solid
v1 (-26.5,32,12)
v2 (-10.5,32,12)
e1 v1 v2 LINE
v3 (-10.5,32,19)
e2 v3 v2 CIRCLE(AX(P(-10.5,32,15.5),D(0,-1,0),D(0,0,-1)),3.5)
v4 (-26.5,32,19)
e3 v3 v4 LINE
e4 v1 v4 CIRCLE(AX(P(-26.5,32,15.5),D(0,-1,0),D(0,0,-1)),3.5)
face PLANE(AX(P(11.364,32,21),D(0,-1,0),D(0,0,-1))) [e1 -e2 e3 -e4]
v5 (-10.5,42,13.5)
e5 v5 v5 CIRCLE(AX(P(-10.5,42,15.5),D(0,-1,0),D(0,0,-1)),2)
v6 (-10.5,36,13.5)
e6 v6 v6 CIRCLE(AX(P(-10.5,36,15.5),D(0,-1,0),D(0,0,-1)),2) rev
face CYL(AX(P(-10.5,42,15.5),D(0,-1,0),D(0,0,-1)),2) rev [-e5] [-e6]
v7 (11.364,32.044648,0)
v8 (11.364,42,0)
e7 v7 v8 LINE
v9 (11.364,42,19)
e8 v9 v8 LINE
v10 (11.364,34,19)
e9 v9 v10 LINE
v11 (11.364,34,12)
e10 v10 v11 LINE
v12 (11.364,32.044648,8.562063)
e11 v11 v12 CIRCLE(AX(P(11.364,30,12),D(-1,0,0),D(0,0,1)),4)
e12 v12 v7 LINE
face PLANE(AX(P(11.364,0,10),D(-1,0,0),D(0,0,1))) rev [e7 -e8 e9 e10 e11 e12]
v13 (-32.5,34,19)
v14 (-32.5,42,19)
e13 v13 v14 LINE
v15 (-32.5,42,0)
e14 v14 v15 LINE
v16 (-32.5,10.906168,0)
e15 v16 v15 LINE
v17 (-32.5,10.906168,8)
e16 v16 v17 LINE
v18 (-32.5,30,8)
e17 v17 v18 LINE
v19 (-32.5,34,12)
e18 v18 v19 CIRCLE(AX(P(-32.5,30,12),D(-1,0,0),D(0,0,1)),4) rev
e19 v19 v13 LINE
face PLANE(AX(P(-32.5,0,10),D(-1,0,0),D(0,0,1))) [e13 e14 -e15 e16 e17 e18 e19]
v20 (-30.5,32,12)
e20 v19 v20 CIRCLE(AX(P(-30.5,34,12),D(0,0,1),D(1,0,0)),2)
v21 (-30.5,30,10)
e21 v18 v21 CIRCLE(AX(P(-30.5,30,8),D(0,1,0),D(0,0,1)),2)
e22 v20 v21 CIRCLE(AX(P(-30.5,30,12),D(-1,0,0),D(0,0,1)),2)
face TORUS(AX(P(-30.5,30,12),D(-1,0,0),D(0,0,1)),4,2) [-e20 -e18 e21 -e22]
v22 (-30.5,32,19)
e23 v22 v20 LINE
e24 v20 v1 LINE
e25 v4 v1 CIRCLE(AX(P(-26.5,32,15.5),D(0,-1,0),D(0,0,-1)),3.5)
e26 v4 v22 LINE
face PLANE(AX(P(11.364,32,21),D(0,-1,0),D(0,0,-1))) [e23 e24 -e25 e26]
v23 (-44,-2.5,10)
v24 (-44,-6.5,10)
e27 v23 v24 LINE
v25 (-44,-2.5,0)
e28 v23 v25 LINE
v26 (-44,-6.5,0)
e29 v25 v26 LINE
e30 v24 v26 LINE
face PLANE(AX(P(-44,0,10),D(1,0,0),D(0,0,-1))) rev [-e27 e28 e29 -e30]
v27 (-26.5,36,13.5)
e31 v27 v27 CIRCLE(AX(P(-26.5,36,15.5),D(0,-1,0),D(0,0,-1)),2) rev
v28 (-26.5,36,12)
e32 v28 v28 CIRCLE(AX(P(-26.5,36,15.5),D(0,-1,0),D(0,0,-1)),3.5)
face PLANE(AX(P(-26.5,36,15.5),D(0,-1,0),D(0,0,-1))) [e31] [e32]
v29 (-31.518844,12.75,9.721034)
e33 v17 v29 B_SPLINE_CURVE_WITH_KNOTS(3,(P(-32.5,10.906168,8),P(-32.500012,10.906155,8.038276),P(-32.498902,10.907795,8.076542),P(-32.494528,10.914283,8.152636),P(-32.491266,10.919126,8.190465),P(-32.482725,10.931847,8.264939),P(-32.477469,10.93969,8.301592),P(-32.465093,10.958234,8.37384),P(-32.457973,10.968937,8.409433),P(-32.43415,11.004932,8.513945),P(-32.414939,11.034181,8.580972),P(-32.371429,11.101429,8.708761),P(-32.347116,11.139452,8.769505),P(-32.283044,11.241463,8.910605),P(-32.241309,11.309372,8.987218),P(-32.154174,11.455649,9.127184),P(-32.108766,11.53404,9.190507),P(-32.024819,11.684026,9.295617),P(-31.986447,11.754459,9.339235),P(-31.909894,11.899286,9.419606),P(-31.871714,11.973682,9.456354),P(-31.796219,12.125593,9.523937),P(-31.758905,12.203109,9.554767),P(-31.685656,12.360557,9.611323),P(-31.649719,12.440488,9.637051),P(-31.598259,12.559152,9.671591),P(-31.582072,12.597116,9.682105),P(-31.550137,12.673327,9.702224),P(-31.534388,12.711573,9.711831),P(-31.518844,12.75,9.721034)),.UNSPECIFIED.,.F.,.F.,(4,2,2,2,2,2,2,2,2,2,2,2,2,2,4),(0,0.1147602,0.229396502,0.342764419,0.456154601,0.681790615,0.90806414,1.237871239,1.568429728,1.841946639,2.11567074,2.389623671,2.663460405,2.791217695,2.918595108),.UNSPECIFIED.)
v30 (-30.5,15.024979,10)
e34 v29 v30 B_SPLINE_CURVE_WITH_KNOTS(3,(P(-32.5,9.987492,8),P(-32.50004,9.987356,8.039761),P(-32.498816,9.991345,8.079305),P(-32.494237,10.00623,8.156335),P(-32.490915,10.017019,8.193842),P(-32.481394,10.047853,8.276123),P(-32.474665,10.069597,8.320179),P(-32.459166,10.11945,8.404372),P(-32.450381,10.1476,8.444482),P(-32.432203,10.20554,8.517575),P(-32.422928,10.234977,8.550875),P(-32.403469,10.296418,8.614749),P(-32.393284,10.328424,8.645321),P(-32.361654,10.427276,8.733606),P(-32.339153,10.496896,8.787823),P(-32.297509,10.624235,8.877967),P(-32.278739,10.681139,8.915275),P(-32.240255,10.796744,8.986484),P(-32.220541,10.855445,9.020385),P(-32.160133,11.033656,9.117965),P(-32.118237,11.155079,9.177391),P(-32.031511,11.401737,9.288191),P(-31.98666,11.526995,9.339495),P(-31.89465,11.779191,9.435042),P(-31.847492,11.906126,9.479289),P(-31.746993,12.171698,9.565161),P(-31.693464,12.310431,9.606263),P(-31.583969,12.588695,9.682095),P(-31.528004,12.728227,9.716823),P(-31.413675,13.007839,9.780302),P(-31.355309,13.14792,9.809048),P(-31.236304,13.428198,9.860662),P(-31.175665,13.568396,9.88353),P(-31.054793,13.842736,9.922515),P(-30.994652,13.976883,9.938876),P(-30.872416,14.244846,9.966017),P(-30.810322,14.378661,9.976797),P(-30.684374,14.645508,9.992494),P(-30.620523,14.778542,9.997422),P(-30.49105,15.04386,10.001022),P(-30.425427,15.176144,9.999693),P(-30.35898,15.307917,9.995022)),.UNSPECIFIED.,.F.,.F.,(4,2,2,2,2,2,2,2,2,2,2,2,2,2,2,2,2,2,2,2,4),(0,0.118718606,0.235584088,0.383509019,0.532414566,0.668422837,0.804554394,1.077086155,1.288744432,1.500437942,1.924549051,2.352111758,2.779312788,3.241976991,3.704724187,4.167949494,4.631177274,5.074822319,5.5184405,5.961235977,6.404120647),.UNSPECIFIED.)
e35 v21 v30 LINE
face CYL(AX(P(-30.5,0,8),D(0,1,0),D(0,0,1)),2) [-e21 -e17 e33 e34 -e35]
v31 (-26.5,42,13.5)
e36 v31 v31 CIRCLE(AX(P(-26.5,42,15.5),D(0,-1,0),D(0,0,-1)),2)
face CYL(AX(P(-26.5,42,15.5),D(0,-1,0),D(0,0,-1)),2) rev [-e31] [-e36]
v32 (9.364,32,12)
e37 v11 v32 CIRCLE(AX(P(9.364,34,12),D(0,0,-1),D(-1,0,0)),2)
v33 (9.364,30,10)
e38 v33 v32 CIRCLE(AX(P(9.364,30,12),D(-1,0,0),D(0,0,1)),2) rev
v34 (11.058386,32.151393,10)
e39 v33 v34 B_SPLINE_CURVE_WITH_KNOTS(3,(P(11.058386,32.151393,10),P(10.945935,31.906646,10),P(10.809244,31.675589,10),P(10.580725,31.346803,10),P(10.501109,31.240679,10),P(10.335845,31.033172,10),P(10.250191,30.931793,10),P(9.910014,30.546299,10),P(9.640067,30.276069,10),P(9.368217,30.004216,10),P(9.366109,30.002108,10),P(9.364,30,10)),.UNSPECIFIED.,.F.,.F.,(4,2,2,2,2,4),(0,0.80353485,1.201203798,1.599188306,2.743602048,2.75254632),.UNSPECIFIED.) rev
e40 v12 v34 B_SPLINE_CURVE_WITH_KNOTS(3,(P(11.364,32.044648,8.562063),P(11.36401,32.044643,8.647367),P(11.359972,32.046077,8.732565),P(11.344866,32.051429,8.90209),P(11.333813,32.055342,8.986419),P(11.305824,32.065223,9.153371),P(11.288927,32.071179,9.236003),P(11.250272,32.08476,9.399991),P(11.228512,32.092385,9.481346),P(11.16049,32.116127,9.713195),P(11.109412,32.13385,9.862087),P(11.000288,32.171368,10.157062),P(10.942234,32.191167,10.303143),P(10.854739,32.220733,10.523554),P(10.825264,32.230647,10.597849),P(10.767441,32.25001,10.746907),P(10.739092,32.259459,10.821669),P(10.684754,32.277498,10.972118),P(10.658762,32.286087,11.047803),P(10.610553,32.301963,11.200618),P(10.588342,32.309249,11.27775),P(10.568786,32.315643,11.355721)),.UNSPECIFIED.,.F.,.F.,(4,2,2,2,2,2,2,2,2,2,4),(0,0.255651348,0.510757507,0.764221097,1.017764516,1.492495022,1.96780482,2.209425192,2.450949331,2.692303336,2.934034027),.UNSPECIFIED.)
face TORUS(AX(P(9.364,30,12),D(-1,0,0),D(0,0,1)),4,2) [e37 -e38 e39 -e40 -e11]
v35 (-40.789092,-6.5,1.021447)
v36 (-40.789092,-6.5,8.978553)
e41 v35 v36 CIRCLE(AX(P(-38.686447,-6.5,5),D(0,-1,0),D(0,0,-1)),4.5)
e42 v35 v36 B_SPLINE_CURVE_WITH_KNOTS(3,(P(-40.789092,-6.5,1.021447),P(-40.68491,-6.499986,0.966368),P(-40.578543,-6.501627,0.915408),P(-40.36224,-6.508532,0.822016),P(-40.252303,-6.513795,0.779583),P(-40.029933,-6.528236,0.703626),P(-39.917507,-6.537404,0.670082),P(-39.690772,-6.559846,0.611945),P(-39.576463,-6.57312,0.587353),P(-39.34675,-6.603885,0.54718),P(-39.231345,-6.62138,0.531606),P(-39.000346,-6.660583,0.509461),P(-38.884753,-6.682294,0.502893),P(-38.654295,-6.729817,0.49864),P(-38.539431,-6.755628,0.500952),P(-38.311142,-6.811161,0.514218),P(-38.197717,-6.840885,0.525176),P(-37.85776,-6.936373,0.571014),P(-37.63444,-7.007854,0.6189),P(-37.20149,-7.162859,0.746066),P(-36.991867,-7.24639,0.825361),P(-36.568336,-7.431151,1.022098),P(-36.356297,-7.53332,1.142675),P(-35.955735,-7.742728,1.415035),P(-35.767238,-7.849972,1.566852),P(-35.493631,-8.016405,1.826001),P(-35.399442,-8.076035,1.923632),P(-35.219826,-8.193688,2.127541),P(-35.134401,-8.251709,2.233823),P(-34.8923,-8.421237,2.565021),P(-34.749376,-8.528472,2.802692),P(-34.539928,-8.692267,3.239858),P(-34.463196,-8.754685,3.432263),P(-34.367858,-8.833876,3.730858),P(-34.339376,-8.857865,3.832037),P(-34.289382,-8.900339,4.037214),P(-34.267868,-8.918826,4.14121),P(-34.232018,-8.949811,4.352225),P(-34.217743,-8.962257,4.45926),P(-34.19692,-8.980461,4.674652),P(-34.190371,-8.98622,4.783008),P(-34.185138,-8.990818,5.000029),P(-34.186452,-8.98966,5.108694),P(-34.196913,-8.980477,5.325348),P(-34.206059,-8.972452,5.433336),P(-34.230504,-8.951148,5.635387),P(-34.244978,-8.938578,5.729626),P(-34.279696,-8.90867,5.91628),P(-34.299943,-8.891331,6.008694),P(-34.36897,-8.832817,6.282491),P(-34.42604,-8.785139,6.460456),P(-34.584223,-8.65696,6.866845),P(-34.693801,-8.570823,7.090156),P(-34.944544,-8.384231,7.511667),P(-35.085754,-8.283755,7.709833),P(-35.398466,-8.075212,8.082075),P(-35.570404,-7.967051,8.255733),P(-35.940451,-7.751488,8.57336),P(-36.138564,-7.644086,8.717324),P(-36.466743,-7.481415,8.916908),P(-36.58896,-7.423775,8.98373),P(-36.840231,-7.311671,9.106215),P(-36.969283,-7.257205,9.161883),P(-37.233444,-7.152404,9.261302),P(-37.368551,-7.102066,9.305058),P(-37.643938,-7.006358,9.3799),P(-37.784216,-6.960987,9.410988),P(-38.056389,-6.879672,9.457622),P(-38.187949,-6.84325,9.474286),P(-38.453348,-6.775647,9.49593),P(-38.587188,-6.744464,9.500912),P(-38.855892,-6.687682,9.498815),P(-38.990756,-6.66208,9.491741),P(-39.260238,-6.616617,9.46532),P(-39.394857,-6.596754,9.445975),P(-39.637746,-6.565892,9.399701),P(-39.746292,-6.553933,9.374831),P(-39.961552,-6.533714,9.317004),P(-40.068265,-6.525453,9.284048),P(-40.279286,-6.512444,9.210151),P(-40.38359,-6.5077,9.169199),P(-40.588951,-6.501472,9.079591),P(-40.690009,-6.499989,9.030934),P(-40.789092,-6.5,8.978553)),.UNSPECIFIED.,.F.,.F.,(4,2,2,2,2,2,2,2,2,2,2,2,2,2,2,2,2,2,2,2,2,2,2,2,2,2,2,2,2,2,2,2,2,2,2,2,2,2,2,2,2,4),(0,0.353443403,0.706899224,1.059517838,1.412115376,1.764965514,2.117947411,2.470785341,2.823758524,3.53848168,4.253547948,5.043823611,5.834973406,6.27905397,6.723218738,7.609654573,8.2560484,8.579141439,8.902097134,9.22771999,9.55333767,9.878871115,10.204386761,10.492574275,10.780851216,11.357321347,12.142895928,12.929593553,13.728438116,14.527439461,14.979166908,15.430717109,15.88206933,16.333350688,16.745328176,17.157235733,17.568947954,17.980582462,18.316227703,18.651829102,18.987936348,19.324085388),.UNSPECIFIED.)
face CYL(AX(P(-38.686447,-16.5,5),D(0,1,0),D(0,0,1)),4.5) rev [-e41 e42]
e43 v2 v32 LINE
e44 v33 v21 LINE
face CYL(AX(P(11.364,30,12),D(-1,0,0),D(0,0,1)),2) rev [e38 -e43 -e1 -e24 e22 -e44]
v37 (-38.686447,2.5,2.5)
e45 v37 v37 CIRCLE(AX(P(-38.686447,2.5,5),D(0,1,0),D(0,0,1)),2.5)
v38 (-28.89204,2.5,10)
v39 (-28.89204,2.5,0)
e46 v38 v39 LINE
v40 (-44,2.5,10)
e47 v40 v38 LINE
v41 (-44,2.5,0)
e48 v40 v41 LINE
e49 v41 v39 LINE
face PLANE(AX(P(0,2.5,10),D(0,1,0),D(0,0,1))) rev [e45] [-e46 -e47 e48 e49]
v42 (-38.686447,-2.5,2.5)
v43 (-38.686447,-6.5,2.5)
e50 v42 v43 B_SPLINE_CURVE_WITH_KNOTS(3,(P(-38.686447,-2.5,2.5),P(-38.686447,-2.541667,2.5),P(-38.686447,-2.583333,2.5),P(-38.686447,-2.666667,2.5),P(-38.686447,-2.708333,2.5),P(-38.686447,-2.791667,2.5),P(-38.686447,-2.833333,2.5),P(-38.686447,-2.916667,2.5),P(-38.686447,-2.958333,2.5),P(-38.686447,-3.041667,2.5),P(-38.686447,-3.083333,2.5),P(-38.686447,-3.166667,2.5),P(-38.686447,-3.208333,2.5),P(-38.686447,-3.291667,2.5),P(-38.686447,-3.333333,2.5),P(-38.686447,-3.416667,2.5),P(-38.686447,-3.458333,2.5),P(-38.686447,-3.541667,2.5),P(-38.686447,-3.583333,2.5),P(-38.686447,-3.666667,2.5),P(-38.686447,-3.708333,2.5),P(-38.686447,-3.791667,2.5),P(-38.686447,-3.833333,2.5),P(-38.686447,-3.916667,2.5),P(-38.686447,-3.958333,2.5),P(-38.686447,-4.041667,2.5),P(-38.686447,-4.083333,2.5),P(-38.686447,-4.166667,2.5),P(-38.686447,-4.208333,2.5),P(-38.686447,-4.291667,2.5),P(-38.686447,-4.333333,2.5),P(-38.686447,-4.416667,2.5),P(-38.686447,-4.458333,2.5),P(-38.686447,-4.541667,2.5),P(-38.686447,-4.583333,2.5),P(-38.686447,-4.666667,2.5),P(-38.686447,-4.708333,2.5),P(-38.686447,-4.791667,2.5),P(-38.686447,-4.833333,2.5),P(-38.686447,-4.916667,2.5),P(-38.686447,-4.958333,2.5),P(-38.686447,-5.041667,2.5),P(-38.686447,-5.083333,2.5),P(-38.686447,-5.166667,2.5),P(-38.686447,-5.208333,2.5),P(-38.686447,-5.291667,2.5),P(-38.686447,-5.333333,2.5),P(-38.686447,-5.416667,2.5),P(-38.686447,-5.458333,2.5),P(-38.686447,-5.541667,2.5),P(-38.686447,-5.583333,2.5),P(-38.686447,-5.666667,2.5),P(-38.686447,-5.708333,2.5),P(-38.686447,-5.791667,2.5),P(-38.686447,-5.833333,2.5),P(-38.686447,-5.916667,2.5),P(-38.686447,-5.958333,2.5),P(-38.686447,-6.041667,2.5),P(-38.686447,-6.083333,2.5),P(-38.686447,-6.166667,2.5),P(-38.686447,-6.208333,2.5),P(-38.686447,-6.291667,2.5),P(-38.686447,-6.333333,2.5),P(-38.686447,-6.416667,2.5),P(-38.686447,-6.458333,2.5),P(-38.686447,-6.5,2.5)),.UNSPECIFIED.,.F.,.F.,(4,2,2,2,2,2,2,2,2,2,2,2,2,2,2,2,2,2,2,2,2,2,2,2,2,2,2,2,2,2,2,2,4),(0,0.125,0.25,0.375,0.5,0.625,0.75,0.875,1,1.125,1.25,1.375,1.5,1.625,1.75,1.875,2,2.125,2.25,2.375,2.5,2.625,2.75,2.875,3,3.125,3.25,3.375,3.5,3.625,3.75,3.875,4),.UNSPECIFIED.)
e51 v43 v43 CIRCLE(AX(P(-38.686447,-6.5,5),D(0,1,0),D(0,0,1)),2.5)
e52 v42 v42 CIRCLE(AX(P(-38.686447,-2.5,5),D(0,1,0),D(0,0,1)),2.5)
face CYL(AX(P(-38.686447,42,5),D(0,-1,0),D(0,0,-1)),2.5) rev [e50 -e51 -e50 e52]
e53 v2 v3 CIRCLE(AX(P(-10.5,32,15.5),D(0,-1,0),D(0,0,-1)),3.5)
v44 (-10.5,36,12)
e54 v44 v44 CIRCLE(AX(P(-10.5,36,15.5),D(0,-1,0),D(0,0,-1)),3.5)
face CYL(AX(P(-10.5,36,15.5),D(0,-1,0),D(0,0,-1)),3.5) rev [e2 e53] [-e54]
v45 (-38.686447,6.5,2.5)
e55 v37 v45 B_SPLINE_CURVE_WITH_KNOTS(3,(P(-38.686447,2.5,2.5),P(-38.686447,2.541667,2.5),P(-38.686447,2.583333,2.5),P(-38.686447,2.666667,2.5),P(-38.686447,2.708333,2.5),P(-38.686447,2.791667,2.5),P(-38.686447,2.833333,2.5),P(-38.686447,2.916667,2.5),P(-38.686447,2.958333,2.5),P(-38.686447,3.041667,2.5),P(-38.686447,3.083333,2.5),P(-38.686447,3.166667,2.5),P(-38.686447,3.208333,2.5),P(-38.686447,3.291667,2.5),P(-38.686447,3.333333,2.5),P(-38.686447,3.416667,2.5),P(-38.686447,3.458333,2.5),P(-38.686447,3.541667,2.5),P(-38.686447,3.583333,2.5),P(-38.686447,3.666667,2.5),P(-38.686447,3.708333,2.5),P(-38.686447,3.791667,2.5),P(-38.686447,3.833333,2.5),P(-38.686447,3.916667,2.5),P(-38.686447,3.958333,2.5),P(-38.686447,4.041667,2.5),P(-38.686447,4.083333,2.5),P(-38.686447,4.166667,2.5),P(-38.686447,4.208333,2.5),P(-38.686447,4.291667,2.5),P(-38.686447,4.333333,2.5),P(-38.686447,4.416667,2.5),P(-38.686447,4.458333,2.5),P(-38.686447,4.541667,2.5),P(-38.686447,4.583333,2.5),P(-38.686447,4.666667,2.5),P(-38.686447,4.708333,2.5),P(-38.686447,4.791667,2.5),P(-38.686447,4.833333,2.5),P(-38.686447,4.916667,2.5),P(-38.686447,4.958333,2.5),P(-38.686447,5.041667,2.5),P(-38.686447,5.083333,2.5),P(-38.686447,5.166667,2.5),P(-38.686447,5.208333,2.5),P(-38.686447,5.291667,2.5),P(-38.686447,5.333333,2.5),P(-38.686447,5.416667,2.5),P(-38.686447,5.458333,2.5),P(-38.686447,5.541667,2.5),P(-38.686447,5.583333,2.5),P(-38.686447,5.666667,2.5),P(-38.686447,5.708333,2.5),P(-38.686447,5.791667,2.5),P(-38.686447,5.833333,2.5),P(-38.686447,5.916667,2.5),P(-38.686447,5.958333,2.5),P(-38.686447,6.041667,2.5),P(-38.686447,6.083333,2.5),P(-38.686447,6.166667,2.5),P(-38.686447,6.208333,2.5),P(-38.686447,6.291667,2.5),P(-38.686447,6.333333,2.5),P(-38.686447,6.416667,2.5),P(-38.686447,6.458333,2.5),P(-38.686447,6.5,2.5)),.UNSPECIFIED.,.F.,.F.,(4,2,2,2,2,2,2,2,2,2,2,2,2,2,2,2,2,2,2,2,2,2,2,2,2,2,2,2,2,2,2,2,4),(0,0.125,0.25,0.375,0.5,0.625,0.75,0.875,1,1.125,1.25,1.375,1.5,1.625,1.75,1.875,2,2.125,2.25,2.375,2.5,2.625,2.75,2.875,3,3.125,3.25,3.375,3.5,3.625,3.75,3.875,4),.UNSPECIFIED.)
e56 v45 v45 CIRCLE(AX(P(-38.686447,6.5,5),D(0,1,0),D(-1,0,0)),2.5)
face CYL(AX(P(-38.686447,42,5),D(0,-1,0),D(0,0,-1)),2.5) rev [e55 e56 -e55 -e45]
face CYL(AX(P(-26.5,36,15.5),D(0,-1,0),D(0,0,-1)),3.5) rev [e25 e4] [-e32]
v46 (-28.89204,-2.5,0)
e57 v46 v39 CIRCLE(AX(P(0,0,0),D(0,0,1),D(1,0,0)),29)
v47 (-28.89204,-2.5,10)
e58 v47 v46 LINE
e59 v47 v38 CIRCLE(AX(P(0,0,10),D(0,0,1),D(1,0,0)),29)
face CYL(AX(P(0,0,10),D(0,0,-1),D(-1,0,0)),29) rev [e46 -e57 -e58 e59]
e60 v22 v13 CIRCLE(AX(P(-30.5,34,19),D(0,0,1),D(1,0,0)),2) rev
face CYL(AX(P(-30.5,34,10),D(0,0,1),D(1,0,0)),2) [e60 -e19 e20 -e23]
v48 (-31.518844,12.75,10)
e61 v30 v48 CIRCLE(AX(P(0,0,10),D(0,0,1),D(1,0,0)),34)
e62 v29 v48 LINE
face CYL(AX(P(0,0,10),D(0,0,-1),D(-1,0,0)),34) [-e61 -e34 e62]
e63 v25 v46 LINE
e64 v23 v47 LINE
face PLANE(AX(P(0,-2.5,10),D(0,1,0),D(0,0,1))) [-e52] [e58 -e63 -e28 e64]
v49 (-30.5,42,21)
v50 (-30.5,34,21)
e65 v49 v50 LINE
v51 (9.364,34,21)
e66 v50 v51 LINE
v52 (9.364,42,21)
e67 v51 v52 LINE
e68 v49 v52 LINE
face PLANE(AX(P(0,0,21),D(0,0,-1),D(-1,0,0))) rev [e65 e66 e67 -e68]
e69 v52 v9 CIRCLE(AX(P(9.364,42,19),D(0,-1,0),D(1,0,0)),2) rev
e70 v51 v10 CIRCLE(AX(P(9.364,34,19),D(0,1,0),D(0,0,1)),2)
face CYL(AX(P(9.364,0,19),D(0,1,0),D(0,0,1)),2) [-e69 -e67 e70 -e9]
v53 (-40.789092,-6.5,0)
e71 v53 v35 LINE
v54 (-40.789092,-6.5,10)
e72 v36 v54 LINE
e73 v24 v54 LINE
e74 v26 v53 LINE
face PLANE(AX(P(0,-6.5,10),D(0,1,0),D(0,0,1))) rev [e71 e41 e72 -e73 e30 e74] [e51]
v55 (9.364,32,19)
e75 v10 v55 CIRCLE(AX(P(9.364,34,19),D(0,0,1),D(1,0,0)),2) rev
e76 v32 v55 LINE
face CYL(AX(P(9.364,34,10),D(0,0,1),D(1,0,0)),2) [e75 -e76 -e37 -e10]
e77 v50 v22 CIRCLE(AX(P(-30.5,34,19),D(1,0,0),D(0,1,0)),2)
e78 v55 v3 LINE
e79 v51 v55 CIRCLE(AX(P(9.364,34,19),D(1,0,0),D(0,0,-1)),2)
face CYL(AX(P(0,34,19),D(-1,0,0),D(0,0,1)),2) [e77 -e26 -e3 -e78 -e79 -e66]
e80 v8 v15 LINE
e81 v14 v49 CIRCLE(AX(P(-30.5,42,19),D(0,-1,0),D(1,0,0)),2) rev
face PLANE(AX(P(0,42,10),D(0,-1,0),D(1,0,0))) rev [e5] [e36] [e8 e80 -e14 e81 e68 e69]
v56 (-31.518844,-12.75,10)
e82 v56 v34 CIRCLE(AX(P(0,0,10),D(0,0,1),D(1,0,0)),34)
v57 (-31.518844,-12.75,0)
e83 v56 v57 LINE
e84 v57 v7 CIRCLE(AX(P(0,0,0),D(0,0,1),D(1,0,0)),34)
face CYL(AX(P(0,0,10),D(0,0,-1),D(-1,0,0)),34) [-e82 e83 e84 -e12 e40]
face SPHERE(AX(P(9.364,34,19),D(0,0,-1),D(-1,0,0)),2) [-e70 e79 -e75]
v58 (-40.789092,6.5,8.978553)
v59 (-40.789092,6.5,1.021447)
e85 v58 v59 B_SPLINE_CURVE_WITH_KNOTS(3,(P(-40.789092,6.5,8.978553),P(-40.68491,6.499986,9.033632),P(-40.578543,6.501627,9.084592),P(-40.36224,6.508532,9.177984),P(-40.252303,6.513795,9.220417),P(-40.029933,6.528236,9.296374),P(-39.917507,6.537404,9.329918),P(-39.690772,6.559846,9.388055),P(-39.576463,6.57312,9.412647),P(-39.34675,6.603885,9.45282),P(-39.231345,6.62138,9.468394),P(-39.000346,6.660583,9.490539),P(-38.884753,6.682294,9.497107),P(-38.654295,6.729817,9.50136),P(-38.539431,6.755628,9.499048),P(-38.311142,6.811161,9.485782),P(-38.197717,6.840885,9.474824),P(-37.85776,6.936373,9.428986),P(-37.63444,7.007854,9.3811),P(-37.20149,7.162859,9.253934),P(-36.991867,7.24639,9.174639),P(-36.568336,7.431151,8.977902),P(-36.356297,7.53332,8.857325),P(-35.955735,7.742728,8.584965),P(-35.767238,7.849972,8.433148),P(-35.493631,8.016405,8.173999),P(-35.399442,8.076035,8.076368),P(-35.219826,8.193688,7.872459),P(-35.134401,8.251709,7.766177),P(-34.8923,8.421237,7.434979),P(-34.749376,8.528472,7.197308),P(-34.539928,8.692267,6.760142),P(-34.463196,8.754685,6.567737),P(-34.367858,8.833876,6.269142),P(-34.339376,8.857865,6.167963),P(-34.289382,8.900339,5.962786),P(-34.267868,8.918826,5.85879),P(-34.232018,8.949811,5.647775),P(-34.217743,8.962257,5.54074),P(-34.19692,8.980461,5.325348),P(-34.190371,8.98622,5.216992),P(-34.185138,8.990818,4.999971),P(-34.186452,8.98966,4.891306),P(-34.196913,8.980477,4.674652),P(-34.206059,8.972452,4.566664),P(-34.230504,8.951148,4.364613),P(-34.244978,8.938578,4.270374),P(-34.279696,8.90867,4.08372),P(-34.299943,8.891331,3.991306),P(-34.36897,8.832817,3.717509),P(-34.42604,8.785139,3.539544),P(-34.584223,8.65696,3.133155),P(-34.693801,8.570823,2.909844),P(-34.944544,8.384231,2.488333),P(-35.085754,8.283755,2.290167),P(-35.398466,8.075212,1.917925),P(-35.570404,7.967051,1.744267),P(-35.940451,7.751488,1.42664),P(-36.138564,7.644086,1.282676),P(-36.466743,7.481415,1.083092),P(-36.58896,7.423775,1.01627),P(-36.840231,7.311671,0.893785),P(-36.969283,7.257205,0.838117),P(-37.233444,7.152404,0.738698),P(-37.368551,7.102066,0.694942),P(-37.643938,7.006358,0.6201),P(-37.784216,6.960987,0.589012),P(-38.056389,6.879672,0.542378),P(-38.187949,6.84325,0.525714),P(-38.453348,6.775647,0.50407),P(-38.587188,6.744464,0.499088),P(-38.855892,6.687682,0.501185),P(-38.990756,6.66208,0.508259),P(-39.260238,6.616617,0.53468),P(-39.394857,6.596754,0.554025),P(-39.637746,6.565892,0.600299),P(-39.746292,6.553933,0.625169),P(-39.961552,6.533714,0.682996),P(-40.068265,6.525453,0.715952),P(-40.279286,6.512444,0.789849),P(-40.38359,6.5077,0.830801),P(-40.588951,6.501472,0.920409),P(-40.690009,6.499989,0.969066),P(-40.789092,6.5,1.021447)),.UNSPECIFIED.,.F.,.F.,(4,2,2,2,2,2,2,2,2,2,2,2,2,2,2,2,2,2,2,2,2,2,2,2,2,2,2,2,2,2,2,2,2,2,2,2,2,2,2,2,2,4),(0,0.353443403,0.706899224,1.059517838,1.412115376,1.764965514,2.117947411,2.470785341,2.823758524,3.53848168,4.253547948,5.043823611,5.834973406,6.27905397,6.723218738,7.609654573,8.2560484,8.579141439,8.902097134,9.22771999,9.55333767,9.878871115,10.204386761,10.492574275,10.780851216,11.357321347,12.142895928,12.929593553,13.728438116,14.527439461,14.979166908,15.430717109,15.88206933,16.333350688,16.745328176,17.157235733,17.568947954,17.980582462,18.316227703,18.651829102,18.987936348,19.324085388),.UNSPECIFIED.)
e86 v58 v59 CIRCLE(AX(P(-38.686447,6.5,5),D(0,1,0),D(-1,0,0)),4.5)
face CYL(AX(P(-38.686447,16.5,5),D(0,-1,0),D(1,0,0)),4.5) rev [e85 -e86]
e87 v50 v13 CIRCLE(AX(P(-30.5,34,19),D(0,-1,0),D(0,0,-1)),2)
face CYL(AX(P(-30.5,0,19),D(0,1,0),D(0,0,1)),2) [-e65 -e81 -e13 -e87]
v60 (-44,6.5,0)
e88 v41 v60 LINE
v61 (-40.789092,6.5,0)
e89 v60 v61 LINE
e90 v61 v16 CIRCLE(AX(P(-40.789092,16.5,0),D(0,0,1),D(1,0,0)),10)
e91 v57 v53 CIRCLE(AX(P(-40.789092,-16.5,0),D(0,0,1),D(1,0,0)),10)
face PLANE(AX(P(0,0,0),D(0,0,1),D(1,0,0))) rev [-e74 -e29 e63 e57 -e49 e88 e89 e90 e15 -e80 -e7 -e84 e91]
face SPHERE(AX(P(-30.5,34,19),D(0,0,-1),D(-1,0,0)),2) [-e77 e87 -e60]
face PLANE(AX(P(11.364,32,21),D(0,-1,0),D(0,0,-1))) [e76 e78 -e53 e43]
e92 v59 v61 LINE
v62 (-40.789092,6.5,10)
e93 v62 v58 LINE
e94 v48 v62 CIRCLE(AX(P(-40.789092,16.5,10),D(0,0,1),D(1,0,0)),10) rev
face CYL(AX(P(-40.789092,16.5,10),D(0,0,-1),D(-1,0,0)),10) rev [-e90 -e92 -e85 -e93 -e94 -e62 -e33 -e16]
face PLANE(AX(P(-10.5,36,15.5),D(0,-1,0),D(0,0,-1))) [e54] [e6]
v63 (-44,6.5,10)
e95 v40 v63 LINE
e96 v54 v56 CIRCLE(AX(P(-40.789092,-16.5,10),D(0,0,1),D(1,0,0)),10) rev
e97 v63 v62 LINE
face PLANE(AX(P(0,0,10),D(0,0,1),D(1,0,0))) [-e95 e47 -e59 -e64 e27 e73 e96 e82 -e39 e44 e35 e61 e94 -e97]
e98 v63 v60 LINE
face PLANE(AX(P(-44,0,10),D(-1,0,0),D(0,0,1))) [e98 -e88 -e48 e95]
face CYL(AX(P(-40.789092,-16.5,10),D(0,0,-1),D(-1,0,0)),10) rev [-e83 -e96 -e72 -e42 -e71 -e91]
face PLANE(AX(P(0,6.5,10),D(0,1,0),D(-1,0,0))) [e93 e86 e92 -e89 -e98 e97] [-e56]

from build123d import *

# Parameters (mm, degrees)
BOSS_EXTRUDE3_DEPTH     = 10
SKETCH3_W               = 43.8640004
SKETCH3_H               = 10
BOSS_EXTRUDE4_DEPTH     = 21
SKETCH4_R               = 2
CUT_EXTRUDE1_DEPTH      = 83.054859698
SKETCH5_R               = 3.5
CUT_EXTRUDE2_DEPTH      = 4
FILLET1_R               = 2
FILLET2_R               = 2
FILLET3_R               = 2
FILLET4_R               = 2
CUT_EXTRUDE3_DEPTH      = 69.769542741
CUT_EXTRUDE3_DEPTH_BACK = 69.769542741
SKETCH6_R               = 2.5
FILLET5_R               = 10
FILLET6_R               = 10
SKETCH7_R               = 4.5
CUT_EXTRUDE4_DEPTH      = 10
CUT_EXTRUDE5_START      = 10
SKETCH8_R               = 4.5
CUT_EXTRUDE5_DEPTH      = 10


# Some blends are built 0.0001 mm under size
with BuildPart() as part:
    # Sketch2 → Boss-Extrude3 (new body)
    with BuildSketch(Plane.XY):
        with BuildLine():
            Line((-44, -2.5), (-44, -6.5))
            Line((-44, -6.5), (-33.372893192, -6.5))
            ThreePointArc((-33.372893192, -6.5), (22.19279887, -25.758099276), (11.3640004, 32.04464846))
            Line((11.3640004, 32.04464846), (11.3640004, 42))
            Line((11.3640004, 42), (-32.5, 42))
            Line((-32.5, 42), (-32.5, 9.987492178))
            ThreePointArc((-32.5, 9.987492178), (-32.982573653, 8.255291346), (-33.372893192, 6.5))
            Line((-33.372893192, 6.5), (-44, 6.5))
            Line((-44, 6.5), (-44, 2.5))
            Line((-44, 2.5), (-28.892040426, 2.5))
            ThreePointArc((-28.892040426, 2.5), (29, 0), (-28.892040426, -2.5))
            Line((-28.892040426, -2.5), (-44, -2.5))
        make_face()
    extrude(amount=BOSS_EXTRUDE3_DEPTH)

    # Sketch3 → Boss-Extrude4 (add)
    with BuildSketch(Plane(origin=(0, 0, 0), x_dir=(-1, 0, 0), z_dir=(0, 0, -1))):
        with Locations((10.5679998, 37)):
            Rectangle(SKETCH3_W, SKETCH3_H)
    extrude(amount=-BOSS_EXTRUDE4_DEPTH)

    # Sketch4 → Cut-Extrude1 (cut, through all)
    with BuildSketch(Plane.XZ.offset(-32)):
        with Locations(Location((-26.5, 15.5, 0), (0, 0, 270))):
            Circle(SKETCH4_R)
        with Locations(Location((-10.5, 15.5, 0), (0, 0, 270))):
            Circle(SKETCH4_R)
    extrude(amount=-CUT_EXTRUDE1_DEPTH, mode=Mode.SUBTRACT)

    # Sketch5 → Cut-Extrude2 (cut)
    with BuildSketch(Plane.XZ.offset(-32)):
        with Locations(Location((-26.5, 15.5, 0), (0, 0, 270))):
            Circle(SKETCH5_R)
        with Locations(Location((-10.5, 15.5, 0), (0, 0, 270))):
            Circle(SKETCH5_R)
    extrude(amount=-CUT_EXTRUDE2_DEPTH, mode=Mode.SUBTRACT)

    # Fillet1
    fillet1_edges = [part.edges().sort_by_distance(p)[0] for p in [
        (-10.5679998, 32, 10),
    ]]
    fillet(fillet1_edges, radius=FILLET1_R - 0.0001)  # a hair under: the kernel refuses the full size

    # Fillet2
    # the kernel refuses this fillet: 2 mm, written as the material it takes off along each edge
    with BuildSketch(Plane(origin=(11.3640004, 30.0001, 11.9999), x_dir=(0, -0.597567009658115, 0.8018189751859569), z_dir=(0, 0.8018189751859569, 0.597567009658115))) as fillet2_piece_1_section:
        with BuildLine():
            CenterArc((1.9999 + FILLET2_R, -FILLET2_R), FILLET2_R, 90, 90)
            Line((1.9999 + FILLET2_R, 0), (1.9999, 0))
            Line((1.9999, 0), (1.9999, -FILLET2_R))
        make_face()
    fillet2_piece_1 = revolve(axis=Axis((11.3640004, 30.0001, 11.9999), (1, 0, 0)), revolution_arc=233.304154445, mode=Mode.PRIVATE)
    fillet2_piece_1 = split(fillet2_piece_1, bisect_by=Plane(origin=(10.740737353, 31.499904871, 10), z_dir=(0, 0, 1)), keep=Keep.TOP, mode=Mode.PRIVATE)
    add(fillet2_piece_1, mode=Mode.SUBTRACT)
    with BuildSketch(Plane(origin=(11.3640004, 30.0001, 11.9999), x_dir=(0, -0.597567009658115, 0.8018189751859569), z_dir=(0, 0.8018189751859569, 0.597567009658115))) as fillet2_piece_2_section:
        with BuildLine():
            CenterArc((1.9999 + FILLET2_R, -FILLET2_R), FILLET2_R, 90, 90)
            Line((1.9999 + FILLET2_R, 0), (1.9999, 0))
            Line((1.9999, 0), (1.9999, -FILLET2_R))
        make_face()
    fillet2_piece_2 = revolve(axis=Axis((11.3640004, 30.0001, 11.9999), (1, 0, 0)), revolution_arc=233.304154445, mode=Mode.PRIVATE)
    fillet2_piece_2 = fillet2_piece_2 - Plane(origin=(0, 0, 9.683888081), x_dir=(-0.9815556821156025, -0.19117647058823523, 0), z_dir=(0, 0, -1)) * Cylinder(34, 16, mode=Mode.PRIVATE)
    add(fillet2_piece_2, mode=Mode.SUBTRACT)
    with BuildSketch(Plane(origin=(11.3640004, 32, 11.9999), x_dir=(-1, 0, 0), z_dir=(0, 0, 1))) as fillet2_piece_3:
        with BuildLine():
            CenterArc((FILLET2_R, -FILLET2_R), FILLET2_R, 90, 90)
            Line((0, -FILLET2_R), (0, 0))
            Line((0, 0), (FILLET2_R, 0))
        make_face()
    extrude(amount=14.0001, mode=Mode.SUBTRACT)

    # Fillet3
    fillet3_edges = [part.edges().sort_by_distance(p)[0] for p in [
        (-32.5, 31.414242852, 10.585757148),
        (-32.5, 19.993796089, 10),
        (-32.5, 32, 16.49995),
    ]]
    fillet(fillet3_edges, radius=FILLET3_R)

    # Fillet4
    fillet4_edges = [part.edges().sort_by_distance(p)[0] for p in [
        (-10.5679998, 32, 21),
        (10.778213962, 32.585786438, 21),
        (-32.5, 38, 21),
        (-31.914213562, 32.585786438, 21),
        (11.3640004, 38, 21),
    ]]
    fillet(fillet4_edges, radius=FILLET4_R - 0.0001)  # a hair under: the kernel refuses the full size

    # Sketch6 → Cut-Extrude3 (cut, two sides: drawn at the far end of the back side and taken through both)
    with BuildSketch(Plane.XZ.offset(6.5).offset(-CUT_EXTRUDE3_DEPTH_BACK)):
        with Locations(Location((-38.686446596, 5, 0), (0, 0, 270))):
            Circle(SKETCH6_R)
    extrude(amount=CUT_EXTRUDE3_DEPTH + CUT_EXTRUDE3_DEPTH_BACK, mode=Mode.SUBTRACT)

    # Fillet5
    # the kernel refuses this fillet: 10 mm, written as the material it adds along each edge
    with BuildSketch(Plane(origin=(-33.372893192, -6.5, 0), x_dir=(0.28439822949725985, -0.9587062360592132, 0), z_dir=(0, 0, 1))) as fillet5_piece_1_section:
        with BuildLine():
            CenterArc((7.477908641, -9.953938032), FILLET5_R, 95.501431601, 67.975687163)
            Line((-2.109153719, -7.109955737), (0, 0))
            ThreePointArc((0, 0), (3.259601203, -0.15661069), (6.519202405, 0))
        make_face()
    fillet5_piece_1 = extrude(amount=10, mode=Mode.PRIVATE)
    fillet5_piece_1 = fillet5_piece_1 - Plane(origin=(-38.686446596, -7.980864668, 5), x_dir=(0, 0, -1), z_dir=(0, -1, 0)) * Cylinder(2.5, 49, mode=Mode.PRIVATE)
    add(fillet5_piece_1)

    # Fillet6
    # the kernel refuses this fillet: 10 mm, written as the material it adds along each edge
    with BuildSketch(Plane(origin=(-33.372893192, 6.5, 0), x_dir=(0.28439822949726035, 0.9587062360592132, 0), z_dir=(0, 0, 1))) as fillet6_piece_1_section:
        with BuildLine():
            CenterArc((7.477908641, 9.953938032), FILLET6_R, 196.522881236, 67.975687163)
            Line((-2.109153719, 7.109955737), (0, 0))
            ThreePointArc((0, 0), (3.259601203, 0.15661069), (6.519202405, 0))
        make_face()
    fillet6_piece_1 = extrude(amount=10, mode=Mode.PRIVATE)
    fillet6_piece_1 = fillet6_piece_1 - Plane(origin=(-38.686446596, 7.980864668, 5), x_dir=(0, 0, -1), z_dir=(0, -1, 0)) * Cylinder(2.5, 49, mode=Mode.PRIVATE)
    add(fillet6_piece_1)

    # Sketch7 → Cut-Extrude4 (cut)
    with BuildSketch(Plane.XZ.offset(6.5)):
        with Locations((-38.686446596, 5)):
            Circle(SKETCH7_R)
    extrude(amount=CUT_EXTRUDE4_DEPTH, mode=Mode.SUBTRACT)

    # Sketch8 → Cut-Extrude5 (cut)
    with BuildSketch(Plane(origin=(0, 6.5, 0), x_dir=(1, 0, 0), z_dir=(0, 1, 0)).offset(CUT_EXTRUDE5_START)):
        with Locations((-38.686446596, -5)):
            Circle(SKETCH8_R)
    extrude(amount=-CUT_EXTRUDE5_DEPTH, mode=Mode.SUBTRACT)


solid = part.part
